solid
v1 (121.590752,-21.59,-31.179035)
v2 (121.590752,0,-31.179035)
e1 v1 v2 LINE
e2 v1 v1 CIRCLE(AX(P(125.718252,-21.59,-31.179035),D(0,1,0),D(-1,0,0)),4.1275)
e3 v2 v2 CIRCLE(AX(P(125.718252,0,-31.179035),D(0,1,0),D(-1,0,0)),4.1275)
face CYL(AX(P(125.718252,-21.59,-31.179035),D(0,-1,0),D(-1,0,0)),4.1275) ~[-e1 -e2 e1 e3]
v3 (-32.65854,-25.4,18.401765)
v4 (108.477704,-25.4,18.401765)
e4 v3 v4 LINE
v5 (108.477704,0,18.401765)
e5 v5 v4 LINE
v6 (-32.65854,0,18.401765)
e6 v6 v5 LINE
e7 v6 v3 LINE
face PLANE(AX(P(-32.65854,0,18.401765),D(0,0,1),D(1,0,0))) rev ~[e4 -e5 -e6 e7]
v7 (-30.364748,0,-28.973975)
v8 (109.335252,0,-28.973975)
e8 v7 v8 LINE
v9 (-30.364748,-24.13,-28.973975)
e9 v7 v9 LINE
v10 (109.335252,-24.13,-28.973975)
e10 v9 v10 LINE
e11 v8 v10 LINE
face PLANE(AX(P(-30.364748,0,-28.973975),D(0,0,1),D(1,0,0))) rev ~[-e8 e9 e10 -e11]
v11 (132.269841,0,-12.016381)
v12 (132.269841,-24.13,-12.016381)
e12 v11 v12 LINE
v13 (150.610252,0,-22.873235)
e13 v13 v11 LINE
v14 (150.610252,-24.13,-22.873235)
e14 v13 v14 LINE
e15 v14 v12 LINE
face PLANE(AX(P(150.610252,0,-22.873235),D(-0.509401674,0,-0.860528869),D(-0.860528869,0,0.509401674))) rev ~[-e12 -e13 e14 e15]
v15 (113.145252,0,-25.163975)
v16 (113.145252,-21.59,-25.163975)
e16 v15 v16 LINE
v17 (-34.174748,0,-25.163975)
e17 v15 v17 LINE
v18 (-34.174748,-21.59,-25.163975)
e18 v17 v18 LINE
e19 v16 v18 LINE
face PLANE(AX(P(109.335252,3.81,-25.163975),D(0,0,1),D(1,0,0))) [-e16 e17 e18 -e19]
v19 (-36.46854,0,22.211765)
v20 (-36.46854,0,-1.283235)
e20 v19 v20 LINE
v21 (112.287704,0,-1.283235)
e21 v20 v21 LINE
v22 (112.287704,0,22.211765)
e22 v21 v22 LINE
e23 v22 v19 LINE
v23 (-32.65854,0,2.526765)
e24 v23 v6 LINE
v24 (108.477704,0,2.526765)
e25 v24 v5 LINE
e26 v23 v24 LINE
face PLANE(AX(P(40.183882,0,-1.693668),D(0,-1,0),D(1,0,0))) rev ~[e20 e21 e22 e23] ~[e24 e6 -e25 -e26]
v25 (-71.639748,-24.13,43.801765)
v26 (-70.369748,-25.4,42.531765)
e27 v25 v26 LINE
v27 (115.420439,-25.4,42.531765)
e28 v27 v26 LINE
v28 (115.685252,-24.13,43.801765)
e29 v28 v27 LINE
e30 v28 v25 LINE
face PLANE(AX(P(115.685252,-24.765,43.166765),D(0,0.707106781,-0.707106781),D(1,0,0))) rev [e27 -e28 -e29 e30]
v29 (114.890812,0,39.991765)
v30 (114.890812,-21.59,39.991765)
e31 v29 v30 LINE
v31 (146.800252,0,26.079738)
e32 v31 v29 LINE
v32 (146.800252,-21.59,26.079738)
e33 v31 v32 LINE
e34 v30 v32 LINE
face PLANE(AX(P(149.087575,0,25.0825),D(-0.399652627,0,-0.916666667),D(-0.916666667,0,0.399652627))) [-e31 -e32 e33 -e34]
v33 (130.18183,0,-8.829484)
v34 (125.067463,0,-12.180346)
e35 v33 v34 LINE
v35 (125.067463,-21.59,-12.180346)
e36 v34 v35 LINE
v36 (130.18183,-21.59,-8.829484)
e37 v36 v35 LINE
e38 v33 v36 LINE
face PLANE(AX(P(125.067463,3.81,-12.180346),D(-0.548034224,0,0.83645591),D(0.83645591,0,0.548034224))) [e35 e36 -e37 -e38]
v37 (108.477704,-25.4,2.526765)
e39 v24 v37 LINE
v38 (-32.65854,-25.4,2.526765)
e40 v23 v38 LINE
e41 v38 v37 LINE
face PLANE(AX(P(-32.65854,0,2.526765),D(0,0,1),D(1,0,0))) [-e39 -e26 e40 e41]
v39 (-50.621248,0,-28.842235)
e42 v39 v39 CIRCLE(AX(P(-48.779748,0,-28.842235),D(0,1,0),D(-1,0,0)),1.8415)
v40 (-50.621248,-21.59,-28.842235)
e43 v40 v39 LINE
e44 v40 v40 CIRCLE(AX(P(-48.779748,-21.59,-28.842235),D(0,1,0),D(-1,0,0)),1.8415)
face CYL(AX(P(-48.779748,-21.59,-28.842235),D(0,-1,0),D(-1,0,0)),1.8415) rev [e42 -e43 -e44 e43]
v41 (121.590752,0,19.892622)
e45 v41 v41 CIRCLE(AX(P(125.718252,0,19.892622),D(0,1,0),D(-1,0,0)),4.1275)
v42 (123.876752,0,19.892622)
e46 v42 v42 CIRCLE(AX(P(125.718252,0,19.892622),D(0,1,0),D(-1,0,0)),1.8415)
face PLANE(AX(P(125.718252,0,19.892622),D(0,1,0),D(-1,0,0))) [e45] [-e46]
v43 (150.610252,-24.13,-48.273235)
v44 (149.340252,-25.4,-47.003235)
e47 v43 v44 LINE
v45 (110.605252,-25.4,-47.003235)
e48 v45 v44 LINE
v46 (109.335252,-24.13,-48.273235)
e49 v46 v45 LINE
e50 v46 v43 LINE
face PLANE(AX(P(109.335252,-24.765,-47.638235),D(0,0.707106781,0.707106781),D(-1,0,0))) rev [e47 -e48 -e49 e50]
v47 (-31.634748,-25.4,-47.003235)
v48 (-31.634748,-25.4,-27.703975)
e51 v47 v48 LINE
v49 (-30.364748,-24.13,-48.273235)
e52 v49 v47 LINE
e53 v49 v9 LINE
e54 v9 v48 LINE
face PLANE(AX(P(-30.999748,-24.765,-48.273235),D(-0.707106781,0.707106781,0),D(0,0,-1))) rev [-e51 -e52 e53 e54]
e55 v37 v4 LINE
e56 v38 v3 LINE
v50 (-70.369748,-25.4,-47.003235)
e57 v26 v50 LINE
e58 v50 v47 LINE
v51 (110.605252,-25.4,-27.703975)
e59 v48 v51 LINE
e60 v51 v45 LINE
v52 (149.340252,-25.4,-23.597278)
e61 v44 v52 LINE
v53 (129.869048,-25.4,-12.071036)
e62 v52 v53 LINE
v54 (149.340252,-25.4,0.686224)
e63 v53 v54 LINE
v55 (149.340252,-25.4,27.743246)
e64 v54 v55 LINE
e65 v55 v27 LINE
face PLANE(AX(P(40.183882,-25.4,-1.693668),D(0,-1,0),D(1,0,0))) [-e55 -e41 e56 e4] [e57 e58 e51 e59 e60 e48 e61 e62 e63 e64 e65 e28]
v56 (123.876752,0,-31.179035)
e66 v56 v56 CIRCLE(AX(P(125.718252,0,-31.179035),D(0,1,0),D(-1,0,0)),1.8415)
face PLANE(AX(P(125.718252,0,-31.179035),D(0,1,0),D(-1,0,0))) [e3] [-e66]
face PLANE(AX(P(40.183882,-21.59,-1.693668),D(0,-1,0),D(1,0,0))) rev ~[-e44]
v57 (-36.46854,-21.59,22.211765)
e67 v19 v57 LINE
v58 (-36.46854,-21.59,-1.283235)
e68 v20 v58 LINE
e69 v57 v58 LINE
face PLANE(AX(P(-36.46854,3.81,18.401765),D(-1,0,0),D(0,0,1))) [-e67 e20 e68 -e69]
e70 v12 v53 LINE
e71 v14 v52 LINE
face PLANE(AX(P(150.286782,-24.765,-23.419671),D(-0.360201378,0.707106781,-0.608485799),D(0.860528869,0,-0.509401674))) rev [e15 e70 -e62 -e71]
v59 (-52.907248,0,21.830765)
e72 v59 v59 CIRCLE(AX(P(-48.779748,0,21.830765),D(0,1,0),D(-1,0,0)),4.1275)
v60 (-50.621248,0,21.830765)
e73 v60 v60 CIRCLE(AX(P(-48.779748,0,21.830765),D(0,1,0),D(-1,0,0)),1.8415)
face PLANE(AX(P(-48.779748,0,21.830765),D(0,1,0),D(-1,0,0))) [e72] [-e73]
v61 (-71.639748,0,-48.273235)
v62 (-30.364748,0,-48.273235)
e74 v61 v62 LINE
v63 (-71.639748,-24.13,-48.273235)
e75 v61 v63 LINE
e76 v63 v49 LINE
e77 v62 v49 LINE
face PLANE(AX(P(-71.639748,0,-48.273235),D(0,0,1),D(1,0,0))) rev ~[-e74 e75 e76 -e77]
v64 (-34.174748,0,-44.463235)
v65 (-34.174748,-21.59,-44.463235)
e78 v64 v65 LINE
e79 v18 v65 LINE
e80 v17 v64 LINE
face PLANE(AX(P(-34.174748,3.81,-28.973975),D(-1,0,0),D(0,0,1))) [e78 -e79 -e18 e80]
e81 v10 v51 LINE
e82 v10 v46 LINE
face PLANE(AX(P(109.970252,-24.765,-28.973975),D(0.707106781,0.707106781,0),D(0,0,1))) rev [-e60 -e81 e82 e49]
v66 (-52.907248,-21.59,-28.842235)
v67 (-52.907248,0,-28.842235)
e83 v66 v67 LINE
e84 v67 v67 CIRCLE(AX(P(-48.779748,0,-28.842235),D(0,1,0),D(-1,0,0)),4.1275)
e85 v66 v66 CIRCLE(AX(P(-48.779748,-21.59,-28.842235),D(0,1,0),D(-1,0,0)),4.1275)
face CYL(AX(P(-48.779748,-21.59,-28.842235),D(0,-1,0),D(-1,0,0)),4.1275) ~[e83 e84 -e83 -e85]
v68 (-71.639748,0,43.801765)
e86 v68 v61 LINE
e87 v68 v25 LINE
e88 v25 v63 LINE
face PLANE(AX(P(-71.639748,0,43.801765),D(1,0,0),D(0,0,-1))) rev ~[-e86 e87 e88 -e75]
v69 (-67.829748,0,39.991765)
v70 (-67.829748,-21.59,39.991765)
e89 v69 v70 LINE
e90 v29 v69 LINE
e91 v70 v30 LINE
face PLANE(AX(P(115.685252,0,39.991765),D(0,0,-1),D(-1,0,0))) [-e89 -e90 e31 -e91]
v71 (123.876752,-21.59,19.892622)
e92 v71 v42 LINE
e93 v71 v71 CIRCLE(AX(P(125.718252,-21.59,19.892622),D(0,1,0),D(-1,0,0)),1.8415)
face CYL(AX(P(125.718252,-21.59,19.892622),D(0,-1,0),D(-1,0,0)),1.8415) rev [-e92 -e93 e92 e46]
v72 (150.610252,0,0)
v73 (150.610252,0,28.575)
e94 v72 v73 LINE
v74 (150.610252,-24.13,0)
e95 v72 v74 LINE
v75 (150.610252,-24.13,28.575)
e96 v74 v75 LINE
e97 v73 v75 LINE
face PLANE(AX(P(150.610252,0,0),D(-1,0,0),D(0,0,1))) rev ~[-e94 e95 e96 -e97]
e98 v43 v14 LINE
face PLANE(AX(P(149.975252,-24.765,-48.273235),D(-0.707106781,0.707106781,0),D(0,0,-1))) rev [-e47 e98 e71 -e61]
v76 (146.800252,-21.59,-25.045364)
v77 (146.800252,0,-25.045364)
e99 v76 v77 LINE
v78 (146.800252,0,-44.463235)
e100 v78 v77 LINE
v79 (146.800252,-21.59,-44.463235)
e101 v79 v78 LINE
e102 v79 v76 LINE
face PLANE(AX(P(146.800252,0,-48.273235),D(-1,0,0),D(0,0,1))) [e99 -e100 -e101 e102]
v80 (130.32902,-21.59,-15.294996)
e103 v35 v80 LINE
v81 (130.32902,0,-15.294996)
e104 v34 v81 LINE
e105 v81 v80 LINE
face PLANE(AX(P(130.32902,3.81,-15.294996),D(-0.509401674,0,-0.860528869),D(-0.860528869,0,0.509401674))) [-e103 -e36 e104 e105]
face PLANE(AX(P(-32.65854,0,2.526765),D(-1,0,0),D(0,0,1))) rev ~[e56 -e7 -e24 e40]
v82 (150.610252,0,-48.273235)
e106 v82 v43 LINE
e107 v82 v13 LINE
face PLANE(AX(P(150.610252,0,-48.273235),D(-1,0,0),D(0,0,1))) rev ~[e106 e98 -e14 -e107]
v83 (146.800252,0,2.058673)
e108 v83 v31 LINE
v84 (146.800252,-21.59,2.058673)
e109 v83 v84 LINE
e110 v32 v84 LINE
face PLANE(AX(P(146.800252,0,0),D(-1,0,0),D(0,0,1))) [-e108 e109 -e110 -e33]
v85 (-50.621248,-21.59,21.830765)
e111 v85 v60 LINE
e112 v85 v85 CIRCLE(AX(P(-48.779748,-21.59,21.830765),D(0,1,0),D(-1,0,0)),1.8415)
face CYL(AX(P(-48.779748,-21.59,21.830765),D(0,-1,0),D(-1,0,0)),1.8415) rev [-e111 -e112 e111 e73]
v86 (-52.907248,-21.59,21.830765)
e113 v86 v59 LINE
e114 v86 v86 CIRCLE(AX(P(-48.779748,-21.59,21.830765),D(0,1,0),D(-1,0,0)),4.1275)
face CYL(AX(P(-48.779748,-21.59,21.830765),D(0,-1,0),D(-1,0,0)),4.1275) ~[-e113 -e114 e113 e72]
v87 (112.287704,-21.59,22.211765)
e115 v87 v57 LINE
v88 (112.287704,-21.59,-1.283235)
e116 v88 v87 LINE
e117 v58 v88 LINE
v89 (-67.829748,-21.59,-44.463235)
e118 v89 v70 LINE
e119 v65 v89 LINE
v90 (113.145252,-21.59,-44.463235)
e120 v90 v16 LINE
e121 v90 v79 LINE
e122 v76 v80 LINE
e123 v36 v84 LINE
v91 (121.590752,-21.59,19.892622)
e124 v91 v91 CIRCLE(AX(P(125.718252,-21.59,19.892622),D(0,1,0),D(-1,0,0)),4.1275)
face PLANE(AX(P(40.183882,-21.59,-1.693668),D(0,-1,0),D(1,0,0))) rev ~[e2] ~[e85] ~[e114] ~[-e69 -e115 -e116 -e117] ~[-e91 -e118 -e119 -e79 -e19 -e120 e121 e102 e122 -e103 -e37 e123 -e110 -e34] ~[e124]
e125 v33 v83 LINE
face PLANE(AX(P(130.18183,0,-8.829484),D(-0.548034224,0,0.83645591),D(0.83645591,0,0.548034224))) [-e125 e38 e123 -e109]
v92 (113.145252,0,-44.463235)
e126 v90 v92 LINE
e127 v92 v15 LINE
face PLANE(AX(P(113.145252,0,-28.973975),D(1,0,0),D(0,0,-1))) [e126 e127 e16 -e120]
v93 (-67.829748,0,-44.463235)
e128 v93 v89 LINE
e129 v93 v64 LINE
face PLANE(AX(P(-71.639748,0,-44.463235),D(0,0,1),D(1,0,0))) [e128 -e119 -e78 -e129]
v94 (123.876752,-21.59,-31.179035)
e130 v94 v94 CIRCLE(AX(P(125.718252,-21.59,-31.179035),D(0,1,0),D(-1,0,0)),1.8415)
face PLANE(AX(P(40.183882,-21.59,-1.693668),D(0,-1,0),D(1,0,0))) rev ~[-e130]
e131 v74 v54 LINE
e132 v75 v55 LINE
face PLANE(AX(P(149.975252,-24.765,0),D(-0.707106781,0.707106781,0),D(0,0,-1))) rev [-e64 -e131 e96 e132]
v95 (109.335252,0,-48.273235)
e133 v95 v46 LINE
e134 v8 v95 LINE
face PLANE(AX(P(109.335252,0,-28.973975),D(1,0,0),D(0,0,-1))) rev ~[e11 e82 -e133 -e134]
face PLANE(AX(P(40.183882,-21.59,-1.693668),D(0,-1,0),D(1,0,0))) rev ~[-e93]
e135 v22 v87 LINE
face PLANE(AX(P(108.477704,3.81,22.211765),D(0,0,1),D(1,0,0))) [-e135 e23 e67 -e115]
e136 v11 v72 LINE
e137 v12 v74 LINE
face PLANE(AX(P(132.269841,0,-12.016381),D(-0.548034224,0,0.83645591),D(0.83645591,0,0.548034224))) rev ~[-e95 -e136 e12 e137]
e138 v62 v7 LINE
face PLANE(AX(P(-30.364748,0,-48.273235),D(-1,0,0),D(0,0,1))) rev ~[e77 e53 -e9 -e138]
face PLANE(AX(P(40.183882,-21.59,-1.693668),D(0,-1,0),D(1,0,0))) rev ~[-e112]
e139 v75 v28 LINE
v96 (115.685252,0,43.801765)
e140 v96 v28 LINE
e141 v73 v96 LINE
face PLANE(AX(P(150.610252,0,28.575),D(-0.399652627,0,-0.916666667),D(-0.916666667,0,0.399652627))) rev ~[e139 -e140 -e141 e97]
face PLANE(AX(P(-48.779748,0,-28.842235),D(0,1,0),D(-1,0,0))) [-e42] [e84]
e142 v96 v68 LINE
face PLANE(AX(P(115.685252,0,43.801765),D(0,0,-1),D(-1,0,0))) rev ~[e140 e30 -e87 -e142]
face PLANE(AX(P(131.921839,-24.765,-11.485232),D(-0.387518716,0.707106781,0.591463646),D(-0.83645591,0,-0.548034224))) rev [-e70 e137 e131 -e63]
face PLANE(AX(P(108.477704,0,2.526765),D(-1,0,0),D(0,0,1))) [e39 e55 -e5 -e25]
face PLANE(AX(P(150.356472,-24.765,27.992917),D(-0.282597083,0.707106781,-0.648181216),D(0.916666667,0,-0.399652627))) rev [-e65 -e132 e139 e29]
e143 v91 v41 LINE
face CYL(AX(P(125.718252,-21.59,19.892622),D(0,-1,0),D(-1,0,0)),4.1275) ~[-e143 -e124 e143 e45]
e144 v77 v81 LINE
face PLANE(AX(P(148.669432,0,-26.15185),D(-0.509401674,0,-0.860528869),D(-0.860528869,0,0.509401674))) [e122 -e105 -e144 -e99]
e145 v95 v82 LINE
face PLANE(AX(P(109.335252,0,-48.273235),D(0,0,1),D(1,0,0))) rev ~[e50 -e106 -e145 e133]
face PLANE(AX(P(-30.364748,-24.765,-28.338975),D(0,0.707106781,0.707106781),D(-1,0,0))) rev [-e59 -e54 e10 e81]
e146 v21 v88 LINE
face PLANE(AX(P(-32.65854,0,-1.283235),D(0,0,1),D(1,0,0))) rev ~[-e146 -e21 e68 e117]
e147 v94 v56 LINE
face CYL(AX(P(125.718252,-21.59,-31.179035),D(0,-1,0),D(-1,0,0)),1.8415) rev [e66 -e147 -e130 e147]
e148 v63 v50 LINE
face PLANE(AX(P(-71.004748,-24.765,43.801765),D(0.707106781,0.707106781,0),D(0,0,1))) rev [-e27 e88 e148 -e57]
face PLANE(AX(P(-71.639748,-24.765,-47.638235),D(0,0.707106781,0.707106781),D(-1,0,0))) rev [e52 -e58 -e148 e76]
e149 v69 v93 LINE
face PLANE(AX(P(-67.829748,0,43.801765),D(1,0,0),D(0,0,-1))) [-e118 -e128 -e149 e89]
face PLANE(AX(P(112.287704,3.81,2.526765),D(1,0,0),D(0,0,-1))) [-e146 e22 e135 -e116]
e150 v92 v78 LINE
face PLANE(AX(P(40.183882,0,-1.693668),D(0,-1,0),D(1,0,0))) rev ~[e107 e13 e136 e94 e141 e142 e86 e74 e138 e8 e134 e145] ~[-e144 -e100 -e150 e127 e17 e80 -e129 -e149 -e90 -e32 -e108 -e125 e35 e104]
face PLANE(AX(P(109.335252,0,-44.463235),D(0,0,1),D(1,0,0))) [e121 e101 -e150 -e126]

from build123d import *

# Parameters (mm, degrees)
F0_W         = 141.1362439394
F0_H         = 15.875
F1_DEPTH     = 25.4
F2_SIZE      = 1.27
F3_T         = 3.81
F3_T3_DEPTH  = 31.75
F3_T5_DEPTH  = 10.3365589148
F3_T7_DEPTH  = 33.02
F3_T9_DEPTH  = 9.8197045256
F3_T11_DEPTH = 9.8197045256
F4_R         = 4.1275
F4_R_2       = 1.8415
F5_DEPTH     = 21.59


# Not quite as in the source:
# - a shell that OpenCascade refuses in one call is made with other operations: the cavity is built on its own and cut out
# - a feature names something its author has since deleted; it is built from what else it names


with BuildPart() as f1:
    # F0 (on Front) → F1 (new body)
    with BuildSketch(Plane.XZ):
        Polygon((115.6852519128, 43.8017650865), (-71.6397480872, 43.8017650865), (-71.6397480872, -48.2732349135), (-30.3647480872, -48.2732349135), (-30.3647480872, -28.973974956), (109.3352519128, -28.973974956), (109.3352519128, -48.2732349135), (150.6102519128, -48.2732349135), (150.6102519128, -22.8732349135), (132.2698407767, -12.0163811026), (150.6102519128, 0), (150.6102519128, 28.575), align=None)
        with Locations((37.9095822573, 10.4642650865)):
            Rectangle(F0_W, F0_H, mode=Mode.SUBTRACT)
    extrude(amount=F1_DEPTH)

    # F2
    f2_edges = [f1.edges().sort_by_distance(p)[0] for p in [
        (-71.639748, -25.4, -2.235735),
        (22.022752, -25.4, 43.801765),
        (133.147752, -25.4, 36.188383),
        (150.610252, -25.4, 14.2875),
        (141.440046, -25.4, -6.008191),
        (141.440046, -25.4, -17.444808),
        (150.610252, -25.4, -35.573235),
        (129.972752, -25.4, -48.273235),
        (109.335252, -25.4, -38.623605),
        (39.485252, -25.4, -28.973975),
        (-30.364748, -25.4, -38.623605),
        (-51.002248, -25.4, -48.273235),
    ]]
    chamfer(f2_edges, length=F2_SIZE)

    # F3: shell of thickness 3.81, made by hand


with BuildPart() as f3_core1:
    # F3_t2: copy of F1
    add(f1.part)

    # the walls: a layer under each face that stays
    f3_faces = [f3_core1.faces().sort_by_distance(p)[0] for p in [
        (141.4400463447, -12.065, -17.4448080081),
        (150.6102519128, -12.065, -35.5732349135),
        (140.2396500387, -24.765, -17.4721355193),
        (141.4400463447, -12.065, -6.0081905513),
        (129.9727519128, -12.065, -48.2732349135),
        (149.9752519128, -24.765, -35.5732349135),
        (39.4852519128, -25.4, -2.2357349135),
        (140.2396500387, -24.765, -6.0355180626),
        (150.6102519128, -12.065, 14.2875),
        (133.1477519128, -12.065, 36.1883825433),
        (22.0227519128, -12.065, 43.8017650865),
        (-71.6397480872, -12.065, -2.2357349135),
        (-51.0022480872, -12.065, -48.2732349135),
        (-30.3647480872, -12.065, -38.6236049347),
        (39.4852519128, -12.065, -28.973974956),
        (109.3352519128, -12.065, -38.6236049347),
        (-32.6585397124, -12.7, 10.4642650865),
        (37.9095822573, -12.7, 18.4017650865),
        (108.477704227, -12.7, 10.4642650865),
        (37.9095822573, -12.7, 2.5267650865),
        (129.9727519128, -24.765, -47.6382349135),
        (-71.0047480872, -24.765, -2.2357349135),
        (22.0227519128, -24.765, 43.1667650865),
        (-51.0022480872, -24.765, -47.6382349135),
        (132.8939724947, -24.765, 35.6062992099),
        (-30.9997480872, -24.765, -37.9886049347),
        (149.9752519128, -24.765, 14.2875),
        (39.4852519128, -24.765, -28.338974956),
        (109.9702519128, -24.765, -37.9886049347),
    ]]
    thicken(f3_faces, amount=-F3_T, mode=Mode.SUBTRACT)

    # F3_s4 → F3_t3 (cut)
    with BuildSketch(Plane.XZ.offset(-3.81)):
        Polygon((132.3101290844, -12.0154639229), (130.3290203992, -15.2949960941), (125.0674629404, -12.1803461703), (130.1818303825, -8.8294840861), align=None)
        Polygon((-30.3266480872, -29.012074956), (-34.1747480872, -28.973974956), (-34.1747480872, -25.163974956), (-30.3647480872, -25.163974956), align=None)
        Polygon((109.2971519128, -29.012074956), (109.3352519128, -25.163974956), (113.1452519128, -25.163974956), (113.1452519128, -28.973974956), align=None)
    extrude(amount=F3_T3_DEPTH, mode=Mode.SUBTRACT)

    # F3_s6 → F3_t5 (cut)
    with BuildSketch(Plane(origin=(96.491386595, 51.0431681427, 2.1966657526), x_dir=(0.4675978526, -0.8839413149, 0), z_dir=(-0.8837623948, -0.4675032053, -0.0201192112))):
        Polygon((83.2395465479, -14.1386059374), (80.1554756401, -16.4580548587), (78.415785798, -14.1899447458), (80.1068084957, -11.8853218988), align=None)
    extrude(amount=F3_T5_DEPTH, mode=Mode.SUBTRACT)

    # F3_s8 → F3_t7 (cut)
    with BuildSketch(Plane.XZ.offset(-3.81)):
        Polygon((-32.6204397124, 2.5648650865), (-36.4685397124, 2.5267650865), (-36.4685397124, -1.2832349135), (-32.6585397124, -1.2832349135), align=None)
        Polygon((-32.6204397124, 18.3636650865), (-36.4685397124, 18.4017650865), (-36.4685397124, 22.2117650865), (-32.6585397124, 22.2117650865), align=None)
        Polygon((108.439604227, 18.3636650865), (108.477704227, 22.2117650865), (112.287704227, 22.2117650865), (112.287704227, 18.4017650865), align=None)
        Polygon((108.439604227, 2.5648650865), (112.287704227, 2.5267650865), (112.287704227, -1.2832349135), (108.477704227, -1.2832349135), align=None)
    extrude(amount=F3_T7_DEPTH, mode=Mode.SUBTRACT)

    # F3_s10 → F3_t9 (cut)
    with BuildSketch(Plane(origin=(-6.3072198515, -6.3072198515, 6.3072198515), x_dir=(0.7071067812, -0.7071067812, 0), z_dir=(-0.5773502692, -0.5773502692, 0.5773502692))):
        Polygon((-4.3514826515, -45.9375348012), (-8.2186326515, -45.9045392333), (-8.2186326515, -43.7048347077), (-6.3136326515, -42.6049824449), align=None)
    extrude(amount=F3_T9_DEPTH, mode=Mode.SUBTRACT)

    # F3_s12 → F3_t11 (cut)
    with BuildSketch(Plane(origin=(32.6307211267, -32.6307211267, 32.6307211267), x_dir=(0.7071067812, 0.7071067812, 0), z_dir=(0.5773502692, -0.5773502692, 0.5773502692))):
        Polygon((60.1920614202, -78.177107985), (62.1542114202, -74.8445556287), (64.0592114202, -75.9444078915), (64.0592114202, -78.1441124172), align=None)
    extrude(amount=F3_T11_DEPTH, mode=Mode.SUBTRACT)


with BuildPart() as f1_1:
    add(f1.part)

    # what is left inside the walls is the cavity
    f3_cavity = [f3_core1.part.solids().sort_by_distance(p)[0] for p in [
        (39.485252, -21.5519, -16.311568),
    ]]
    add(f3_cavity, mode=Mode.SUBTRACT)

    # F4 (on face) → F5 (join, through all)
    with BuildSketch(Plane(origin=(0, -21.59, 0), x_dir=(-1, 0, 0), z_dir=(0, 1, 0))):
        with Locations((48.7797480872, 21.8307650865)):
            Circle(F4_R)
        with Locations((48.7797480872, 21.8307650865)):
            Circle(F4_R_2, mode=Mode.SUBTRACT)
        with Locations((48.7797480872, -28.8422349135)):
            Circle(F4_R)
        with Locations((48.7797480872, -28.8422349135)):
            Circle(F4_R_2, mode=Mode.SUBTRACT)
        with Locations((-125.7182519128, 19.8926216617)):
            Circle(F4_R)
        with Locations((-125.7182519128, 19.8926216617)):
            Circle(F4_R_2, mode=Mode.SUBTRACT)
        with Locations((-125.7182519128, -31.1790349135)):
            Circle(F4_R)
        with Locations((-125.7182519128, -31.1790349135)):
            Circle(F4_R_2, mode=Mode.SUBTRACT)
    extrude(amount=F5_DEPTH)


solid = f1_1.part
